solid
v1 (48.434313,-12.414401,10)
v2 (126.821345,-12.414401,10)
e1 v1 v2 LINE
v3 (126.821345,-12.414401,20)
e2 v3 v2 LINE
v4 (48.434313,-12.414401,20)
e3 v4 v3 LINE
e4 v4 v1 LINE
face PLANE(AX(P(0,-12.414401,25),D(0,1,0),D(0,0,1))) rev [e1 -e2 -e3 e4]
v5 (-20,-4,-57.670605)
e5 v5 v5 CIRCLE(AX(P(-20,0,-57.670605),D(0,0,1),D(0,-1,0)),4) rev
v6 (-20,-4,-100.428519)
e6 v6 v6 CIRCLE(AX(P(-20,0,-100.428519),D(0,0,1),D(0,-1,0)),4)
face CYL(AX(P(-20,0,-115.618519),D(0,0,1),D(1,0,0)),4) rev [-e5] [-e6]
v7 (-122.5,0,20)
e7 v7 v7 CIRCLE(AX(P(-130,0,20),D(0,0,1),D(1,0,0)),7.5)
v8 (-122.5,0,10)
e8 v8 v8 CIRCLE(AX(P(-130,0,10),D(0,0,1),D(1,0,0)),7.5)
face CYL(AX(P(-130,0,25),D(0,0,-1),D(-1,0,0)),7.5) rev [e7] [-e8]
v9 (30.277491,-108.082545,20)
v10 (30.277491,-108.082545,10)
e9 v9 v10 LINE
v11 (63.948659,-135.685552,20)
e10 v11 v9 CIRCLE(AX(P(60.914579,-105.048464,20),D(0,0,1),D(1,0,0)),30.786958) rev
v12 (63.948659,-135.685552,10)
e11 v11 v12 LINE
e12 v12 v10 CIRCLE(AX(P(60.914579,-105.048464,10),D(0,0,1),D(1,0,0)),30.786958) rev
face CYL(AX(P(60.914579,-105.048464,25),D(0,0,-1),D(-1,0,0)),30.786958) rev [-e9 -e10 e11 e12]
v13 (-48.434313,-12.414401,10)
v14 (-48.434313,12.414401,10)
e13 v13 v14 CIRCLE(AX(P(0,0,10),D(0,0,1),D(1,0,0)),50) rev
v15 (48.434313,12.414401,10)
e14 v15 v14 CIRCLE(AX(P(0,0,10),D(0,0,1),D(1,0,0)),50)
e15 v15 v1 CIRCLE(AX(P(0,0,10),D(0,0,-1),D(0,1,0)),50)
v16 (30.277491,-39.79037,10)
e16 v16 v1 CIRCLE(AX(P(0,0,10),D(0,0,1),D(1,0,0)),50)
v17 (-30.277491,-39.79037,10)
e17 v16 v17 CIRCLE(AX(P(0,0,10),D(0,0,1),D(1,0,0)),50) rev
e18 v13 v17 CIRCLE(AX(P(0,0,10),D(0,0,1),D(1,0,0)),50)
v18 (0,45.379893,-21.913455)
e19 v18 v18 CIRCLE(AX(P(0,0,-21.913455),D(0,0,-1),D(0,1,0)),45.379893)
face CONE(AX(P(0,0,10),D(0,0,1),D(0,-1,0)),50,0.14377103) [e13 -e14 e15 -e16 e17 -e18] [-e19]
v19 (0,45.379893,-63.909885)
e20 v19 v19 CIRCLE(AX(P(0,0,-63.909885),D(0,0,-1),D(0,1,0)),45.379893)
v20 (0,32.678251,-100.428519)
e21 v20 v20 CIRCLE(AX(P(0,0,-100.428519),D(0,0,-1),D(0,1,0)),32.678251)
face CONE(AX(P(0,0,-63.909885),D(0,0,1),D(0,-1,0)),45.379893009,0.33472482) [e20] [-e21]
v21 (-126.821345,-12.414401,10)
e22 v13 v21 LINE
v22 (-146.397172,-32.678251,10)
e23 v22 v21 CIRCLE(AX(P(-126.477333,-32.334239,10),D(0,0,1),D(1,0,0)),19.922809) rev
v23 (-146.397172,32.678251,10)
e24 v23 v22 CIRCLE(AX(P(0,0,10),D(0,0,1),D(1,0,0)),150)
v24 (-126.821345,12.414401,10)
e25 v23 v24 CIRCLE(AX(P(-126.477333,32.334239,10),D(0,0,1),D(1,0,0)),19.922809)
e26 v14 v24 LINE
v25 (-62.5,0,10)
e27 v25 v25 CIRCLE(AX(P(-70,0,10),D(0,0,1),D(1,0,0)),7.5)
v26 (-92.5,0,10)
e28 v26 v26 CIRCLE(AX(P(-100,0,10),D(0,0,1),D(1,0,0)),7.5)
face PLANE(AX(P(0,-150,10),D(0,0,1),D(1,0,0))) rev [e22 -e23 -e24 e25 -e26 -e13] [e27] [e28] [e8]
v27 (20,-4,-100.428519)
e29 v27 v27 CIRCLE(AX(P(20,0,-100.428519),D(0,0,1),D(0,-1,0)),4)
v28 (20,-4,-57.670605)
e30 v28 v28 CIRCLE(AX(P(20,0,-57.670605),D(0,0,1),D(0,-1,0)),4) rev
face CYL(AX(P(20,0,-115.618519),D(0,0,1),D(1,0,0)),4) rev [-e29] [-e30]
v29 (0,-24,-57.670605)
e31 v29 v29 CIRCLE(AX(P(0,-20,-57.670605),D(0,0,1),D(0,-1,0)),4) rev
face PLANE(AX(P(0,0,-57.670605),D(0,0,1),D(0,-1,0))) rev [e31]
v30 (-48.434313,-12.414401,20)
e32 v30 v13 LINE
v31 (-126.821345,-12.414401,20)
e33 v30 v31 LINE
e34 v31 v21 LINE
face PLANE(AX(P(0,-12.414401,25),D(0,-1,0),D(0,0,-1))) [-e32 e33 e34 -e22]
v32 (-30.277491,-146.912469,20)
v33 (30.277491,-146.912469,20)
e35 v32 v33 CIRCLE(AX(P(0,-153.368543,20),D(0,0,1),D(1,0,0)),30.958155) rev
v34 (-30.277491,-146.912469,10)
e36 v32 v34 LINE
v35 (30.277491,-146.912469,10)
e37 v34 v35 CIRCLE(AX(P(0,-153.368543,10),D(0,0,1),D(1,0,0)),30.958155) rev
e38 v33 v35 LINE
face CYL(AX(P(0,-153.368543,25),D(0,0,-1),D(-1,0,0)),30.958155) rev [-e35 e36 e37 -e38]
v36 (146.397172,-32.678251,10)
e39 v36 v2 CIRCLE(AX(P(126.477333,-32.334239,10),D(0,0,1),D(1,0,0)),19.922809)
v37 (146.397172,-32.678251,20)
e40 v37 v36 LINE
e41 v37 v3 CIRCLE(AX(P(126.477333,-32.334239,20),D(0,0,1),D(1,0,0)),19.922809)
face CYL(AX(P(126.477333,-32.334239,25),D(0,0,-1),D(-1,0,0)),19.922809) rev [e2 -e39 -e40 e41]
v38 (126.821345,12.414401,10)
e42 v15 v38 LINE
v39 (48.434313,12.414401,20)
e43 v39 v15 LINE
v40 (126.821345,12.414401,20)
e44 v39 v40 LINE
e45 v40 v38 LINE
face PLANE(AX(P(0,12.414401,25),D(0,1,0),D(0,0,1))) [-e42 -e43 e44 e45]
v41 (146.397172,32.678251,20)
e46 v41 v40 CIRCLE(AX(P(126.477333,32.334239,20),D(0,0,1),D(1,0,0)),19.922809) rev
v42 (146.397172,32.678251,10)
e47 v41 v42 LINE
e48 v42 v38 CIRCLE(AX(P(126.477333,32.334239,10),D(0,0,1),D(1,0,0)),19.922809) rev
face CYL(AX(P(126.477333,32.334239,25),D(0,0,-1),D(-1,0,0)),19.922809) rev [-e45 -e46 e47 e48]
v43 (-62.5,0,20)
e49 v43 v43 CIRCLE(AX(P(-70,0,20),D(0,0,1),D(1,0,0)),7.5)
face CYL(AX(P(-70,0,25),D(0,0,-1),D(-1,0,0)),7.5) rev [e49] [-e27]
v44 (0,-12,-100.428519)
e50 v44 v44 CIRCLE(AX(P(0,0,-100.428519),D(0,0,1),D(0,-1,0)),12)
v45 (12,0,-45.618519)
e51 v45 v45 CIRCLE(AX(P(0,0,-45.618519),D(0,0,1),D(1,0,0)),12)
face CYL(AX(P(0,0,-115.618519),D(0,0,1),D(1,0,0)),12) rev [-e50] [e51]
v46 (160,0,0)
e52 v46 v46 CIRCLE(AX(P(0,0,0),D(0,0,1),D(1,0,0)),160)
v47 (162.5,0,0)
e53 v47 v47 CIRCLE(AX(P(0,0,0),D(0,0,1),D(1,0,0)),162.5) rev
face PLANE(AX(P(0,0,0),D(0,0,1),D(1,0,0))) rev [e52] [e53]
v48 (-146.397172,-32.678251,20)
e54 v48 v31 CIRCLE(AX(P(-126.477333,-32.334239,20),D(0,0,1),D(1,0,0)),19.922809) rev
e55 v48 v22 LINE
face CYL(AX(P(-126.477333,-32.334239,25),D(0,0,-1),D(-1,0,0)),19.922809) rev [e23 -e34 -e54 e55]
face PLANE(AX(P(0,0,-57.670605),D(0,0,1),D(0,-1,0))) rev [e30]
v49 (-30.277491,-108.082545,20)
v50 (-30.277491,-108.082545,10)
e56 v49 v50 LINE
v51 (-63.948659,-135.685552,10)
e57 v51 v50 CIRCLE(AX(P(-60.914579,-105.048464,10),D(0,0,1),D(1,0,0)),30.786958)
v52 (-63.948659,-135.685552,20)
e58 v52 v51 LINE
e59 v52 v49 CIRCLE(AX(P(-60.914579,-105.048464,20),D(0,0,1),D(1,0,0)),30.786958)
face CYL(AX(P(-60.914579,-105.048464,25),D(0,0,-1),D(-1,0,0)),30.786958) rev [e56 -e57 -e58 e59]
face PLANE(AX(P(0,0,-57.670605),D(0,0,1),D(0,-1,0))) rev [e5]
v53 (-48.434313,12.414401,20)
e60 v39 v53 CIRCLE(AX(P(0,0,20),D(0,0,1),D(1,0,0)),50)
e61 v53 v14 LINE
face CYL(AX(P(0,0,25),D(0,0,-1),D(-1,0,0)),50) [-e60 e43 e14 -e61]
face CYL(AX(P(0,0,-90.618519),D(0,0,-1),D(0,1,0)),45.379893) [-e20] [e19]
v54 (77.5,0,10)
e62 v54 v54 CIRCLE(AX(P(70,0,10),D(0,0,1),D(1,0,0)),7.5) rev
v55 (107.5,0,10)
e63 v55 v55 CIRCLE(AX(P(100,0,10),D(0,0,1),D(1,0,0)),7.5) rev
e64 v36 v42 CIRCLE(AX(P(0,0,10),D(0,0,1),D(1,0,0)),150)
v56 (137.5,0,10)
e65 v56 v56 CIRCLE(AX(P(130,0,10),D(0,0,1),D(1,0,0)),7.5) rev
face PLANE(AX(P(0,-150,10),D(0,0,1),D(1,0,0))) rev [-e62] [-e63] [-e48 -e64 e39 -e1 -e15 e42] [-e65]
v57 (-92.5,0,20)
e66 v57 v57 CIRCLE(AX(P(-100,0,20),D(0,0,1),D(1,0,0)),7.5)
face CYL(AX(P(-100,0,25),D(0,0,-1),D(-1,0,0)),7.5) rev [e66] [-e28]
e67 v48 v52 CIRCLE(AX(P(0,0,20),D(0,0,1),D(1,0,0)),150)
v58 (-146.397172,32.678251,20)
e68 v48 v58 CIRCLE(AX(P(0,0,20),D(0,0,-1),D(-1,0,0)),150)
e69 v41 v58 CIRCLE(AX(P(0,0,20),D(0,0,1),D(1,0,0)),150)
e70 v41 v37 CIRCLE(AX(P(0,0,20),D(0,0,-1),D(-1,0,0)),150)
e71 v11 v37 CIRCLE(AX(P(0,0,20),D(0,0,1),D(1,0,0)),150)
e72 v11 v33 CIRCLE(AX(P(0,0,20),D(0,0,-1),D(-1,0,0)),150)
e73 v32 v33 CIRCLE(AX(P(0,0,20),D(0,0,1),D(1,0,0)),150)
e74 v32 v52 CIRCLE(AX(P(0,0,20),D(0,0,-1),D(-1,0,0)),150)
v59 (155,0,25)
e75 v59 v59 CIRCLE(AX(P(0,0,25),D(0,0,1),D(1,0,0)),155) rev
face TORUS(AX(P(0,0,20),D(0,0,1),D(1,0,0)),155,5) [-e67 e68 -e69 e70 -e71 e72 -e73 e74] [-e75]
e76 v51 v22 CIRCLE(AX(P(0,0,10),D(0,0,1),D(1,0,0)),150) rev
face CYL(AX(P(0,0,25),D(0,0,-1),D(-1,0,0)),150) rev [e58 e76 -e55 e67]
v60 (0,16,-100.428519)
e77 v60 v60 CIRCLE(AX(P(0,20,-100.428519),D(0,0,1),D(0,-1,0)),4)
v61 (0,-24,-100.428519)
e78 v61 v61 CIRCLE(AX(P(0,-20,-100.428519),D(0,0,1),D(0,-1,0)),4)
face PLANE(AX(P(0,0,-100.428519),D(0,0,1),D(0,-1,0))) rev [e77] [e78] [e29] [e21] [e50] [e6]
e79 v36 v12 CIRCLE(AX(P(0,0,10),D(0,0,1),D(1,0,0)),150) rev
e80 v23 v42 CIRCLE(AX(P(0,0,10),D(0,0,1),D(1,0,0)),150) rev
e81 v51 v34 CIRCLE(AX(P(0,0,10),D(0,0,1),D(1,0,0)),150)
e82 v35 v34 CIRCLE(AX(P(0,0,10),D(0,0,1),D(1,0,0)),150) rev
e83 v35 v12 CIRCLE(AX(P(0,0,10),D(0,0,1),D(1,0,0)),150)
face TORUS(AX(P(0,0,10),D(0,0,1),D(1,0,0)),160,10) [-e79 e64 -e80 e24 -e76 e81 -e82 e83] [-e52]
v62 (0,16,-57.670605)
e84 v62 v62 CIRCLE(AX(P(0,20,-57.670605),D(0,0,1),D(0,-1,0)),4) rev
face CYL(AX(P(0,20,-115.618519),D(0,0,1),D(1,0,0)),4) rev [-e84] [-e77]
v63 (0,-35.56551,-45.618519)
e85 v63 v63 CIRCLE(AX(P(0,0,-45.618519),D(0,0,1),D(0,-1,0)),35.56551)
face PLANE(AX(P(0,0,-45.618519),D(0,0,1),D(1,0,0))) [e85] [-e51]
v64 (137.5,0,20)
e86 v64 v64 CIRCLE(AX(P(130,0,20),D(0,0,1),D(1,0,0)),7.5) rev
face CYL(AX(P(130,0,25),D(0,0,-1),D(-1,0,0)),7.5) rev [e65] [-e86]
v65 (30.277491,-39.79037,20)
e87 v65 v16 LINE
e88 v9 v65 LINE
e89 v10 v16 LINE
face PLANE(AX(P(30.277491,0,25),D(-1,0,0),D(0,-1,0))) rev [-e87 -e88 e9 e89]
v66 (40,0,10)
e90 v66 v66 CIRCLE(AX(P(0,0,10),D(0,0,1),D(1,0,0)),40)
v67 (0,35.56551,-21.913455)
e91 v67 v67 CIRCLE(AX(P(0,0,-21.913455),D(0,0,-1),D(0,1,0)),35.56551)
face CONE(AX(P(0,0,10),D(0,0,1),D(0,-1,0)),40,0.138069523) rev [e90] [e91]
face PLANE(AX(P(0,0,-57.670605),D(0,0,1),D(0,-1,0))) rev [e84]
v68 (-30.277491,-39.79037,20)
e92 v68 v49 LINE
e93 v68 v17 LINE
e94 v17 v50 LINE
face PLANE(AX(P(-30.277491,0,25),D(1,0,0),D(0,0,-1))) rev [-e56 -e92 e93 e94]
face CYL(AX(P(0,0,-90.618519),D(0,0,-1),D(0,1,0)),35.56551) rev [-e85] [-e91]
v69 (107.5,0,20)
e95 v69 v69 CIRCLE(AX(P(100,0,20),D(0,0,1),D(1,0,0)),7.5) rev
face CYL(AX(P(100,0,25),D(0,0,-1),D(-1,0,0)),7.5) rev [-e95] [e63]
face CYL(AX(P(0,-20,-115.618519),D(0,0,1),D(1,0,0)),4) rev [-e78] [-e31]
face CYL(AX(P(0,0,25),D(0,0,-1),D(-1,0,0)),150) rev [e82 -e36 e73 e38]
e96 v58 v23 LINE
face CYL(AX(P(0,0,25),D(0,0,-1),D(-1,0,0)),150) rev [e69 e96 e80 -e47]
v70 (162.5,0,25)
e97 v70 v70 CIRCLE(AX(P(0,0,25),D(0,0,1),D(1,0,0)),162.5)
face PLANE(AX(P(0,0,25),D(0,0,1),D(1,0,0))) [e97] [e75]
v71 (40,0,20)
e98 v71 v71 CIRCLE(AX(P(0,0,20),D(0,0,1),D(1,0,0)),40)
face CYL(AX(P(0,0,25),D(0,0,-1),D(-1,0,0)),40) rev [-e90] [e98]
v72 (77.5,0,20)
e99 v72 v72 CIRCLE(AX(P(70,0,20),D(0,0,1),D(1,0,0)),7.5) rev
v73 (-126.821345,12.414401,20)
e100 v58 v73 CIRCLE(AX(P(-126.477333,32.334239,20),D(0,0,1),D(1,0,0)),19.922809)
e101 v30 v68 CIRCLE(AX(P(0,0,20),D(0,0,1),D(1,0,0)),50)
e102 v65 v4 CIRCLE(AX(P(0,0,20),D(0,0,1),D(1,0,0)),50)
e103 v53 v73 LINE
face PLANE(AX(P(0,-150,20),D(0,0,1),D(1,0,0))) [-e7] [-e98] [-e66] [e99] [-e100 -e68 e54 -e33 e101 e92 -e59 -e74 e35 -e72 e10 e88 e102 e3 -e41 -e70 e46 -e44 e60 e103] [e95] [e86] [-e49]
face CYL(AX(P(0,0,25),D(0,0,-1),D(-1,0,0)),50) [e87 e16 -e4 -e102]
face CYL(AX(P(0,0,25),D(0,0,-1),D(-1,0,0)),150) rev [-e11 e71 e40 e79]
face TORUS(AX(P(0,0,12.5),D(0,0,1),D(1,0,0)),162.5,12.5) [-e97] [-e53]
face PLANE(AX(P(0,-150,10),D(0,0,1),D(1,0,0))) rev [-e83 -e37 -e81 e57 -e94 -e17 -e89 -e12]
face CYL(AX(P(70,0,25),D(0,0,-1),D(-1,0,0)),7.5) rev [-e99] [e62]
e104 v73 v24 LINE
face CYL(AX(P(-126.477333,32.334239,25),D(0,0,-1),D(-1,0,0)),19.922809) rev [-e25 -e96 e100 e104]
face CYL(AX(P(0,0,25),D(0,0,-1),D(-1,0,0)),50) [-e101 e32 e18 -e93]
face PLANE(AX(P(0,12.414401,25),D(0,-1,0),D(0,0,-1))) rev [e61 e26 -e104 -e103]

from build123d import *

# Parameters (mm, degrees)
SZKIC1_R                    = 175
SZKIC1_R_2                  = 40
SZKIC1_R_3                  = 7.5
DODANIE_WYCI_GNI_CIE1_DEPTH = 25
ZAOKR_GLENIE1_R             = 12.5
SZKIC2_W                    = 10
SZKIC2_H                    = 150
SZKIC3_W                    = 5
SZKIC3_H                    = 150
ZAOKR_GLENIE4_R             = 10
ZAOKR_GLENIE5_R             = 5
SZKIC5_R                    = 12
SZKIC5_R_2                  = 4
WYTNIJ_WYCI_GNI_CIE1_DEPTH  = 25
DODANIE_WYCI_GNI_CIE4_START = 45
SZKIC9_R                    = 27.052132897
SZKIC9_R_2                  = 12
SZKIC9_R_3                  = 4
DODANIE_WYCI_GNI_CIE4_DEPTH = 45


with BuildPart() as part:
    # Szkic1 → Dodanie-wyciągnięcie1 (new body)
    with BuildSketch(Plane.XY):
        Circle(SZKIC1_R)
        Circle(SZKIC1_R_2, mode=Mode.SUBTRACT)
        with BuildLine():
            ThreePointArc((63.948658552, -135.685552176), (41.3963046, -128.857575517), (30.277490786, -108.082544509))
            Line((30.277490786, -108.082544509), (30.277490786, -39.790370088))
            ThreePointArc((30.277490786, -39.790370088), (41.668308443, -27.636064689), (48.434312767, -12.414400782))
            Line((48.434312767, -12.414400782), (126.821344913, -12.414400782))
            ThreePointArc((126.821344913, -12.414400782), (140.806039181, -18.492039568), (146.397171731, -32.678251316))
            ThreePointArc((146.397171731, -32.678251316), (117.106652616, -93.733835476), (63.948658552, -135.685552176))
        make_face(mode=Mode.SUBTRACT)
        with BuildLine():
            ThreePointArc((146.397171731, 32.678251316), (140.806039181, 18.492039568), (126.821344913, 12.414400782))
            Line((126.821344913, 12.414400782), (48.434312767, 12.414400782))
            ThreePointArc((48.434312767, 12.414400782), (0, 50), (-48.434312767, 12.414400782))
            Line((-48.434312767, 12.414400782), (-126.821344913, 12.414400782))
            ThreePointArc((-126.821344913, 12.414400782), (-140.806039181, 18.492039568), (-146.397171731, 32.678251316))
            ThreePointArc((-146.397171731, 32.678251316), (0, 150), (146.397171731, 32.678251316))
        make_face(mode=Mode.SUBTRACT)
        with BuildLine():
            ThreePointArc((-146.397171731, -32.678251316), (-140.806039181, -18.492039568), (-126.821344913, -12.414400782))
            Line((-126.821344913, -12.414400782), (-48.434312767, -12.414400782))
            ThreePointArc((-48.434312767, -12.414400782), (-41.668308443, -27.636064689), (-30.277490786, -39.790370088))
            Line((-30.277490786, -39.790370088), (-30.277490786, -108.082544509))
            ThreePointArc((-30.277490786, -108.082544509), (-41.3963046, -128.857575517), (-63.948658552, -135.685552176))
            ThreePointArc((-63.948658552, -135.685552176), (-117.106652616, -93.733835476), (-146.397171731, -32.678251316))
        make_face(mode=Mode.SUBTRACT)
        with BuildLine():
            ThreePointArc((-30.277490786, -146.912469014), (0, -122.410388377), (30.277490786, -146.912469014))
            ThreePointArc((30.277490786, -146.912469014), (0, -150), (-30.277490786, -146.912469014))
        make_face(mode=Mode.SUBTRACT)
        with Locations((-70, 0)):
            Circle(SZKIC1_R_3, mode=Mode.SUBTRACT)
        with Locations((-100, 0)):
            Circle(SZKIC1_R_3, mode=Mode.SUBTRACT)
        with Locations((-130, 0)):
            Circle(SZKIC1_R_3, mode=Mode.SUBTRACT)
        with Locations((100, 0)):
            Circle(SZKIC1_R_3, mode=Mode.SUBTRACT)
        with Locations((70, 0)):
            Circle(SZKIC1_R_3, mode=Mode.SUBTRACT)
        with Locations((130, 0)):
            Circle(SZKIC1_R_3, mode=Mode.SUBTRACT)
    extrude(amount=DODANIE_WYCI_GNI_CIE1_DEPTH)

    # Zaokrąglenie1
    zaokr_glenie1_edges = [part.edges().sort_by_distance(p)[0] for p in [
        (-175, 0, 25),
        (-175, 0, 0),
    ]]
    fillet(zaokr_glenie1_edges, radius=ZAOKR_GLENIE1_R - 0.0001)  # a hair under: the kernel refuses the full size

    # Szkic2 → Wycięcie-obrót1 (revolve, cut)
    with BuildSketch(Plane(origin=(0, 0, 0), x_dir=(0, 0, -1), z_dir=(1, 0, 0)), mode=Mode.PRIVATE) as wyci_cie_obr_t1_sk:
        with Locations((-5, -75)):
            Rectangle(SZKIC2_W, SZKIC2_H)
    revolve(wyci_cie_obr_t1_sk.sketch.rotate(Axis((0, 0, 10), (0, 0, -1)), 77.416921492), axis=Axis((0, 0, 10), (0, 0, -1)), mode=Mode.SUBTRACT)

    # Szkic3 → Wycięcie-obrót2 (revolve, cut)
    with BuildSketch(Plane(origin=(0, 0, 0), x_dir=(0, 0, -1), z_dir=(1, 0, 0)), mode=Mode.PRIVATE) as wyci_cie_obr_t2_sk:
        with Locations((-22.5, -75)):
            Rectangle(SZKIC3_W, SZKIC3_H)
    revolve(wyci_cie_obr_t2_sk.sketch.rotate(Axis((0, 0, 20), (0, 0, 1)), 90), axis=Axis((0, 0, 20), (0, 0, 1)), mode=Mode.SUBTRACT)

    # Zaokrąglenie4
    zaokr_glenie4_edges = [part.edges().sort_by_distance(p)[0] for p in [
        (150, 0, 0),
    ]]
    fillet(zaokr_glenie4_edges, radius=ZAOKR_GLENIE4_R - 0.0001)  # a hair under: the kernel refuses the full size

    # Zaokrąglenie5
    zaokr_glenie5_edges = [part.edges().sort_by_distance(p)[0] for p in [
        (149.096572328, -16.438130069, 25),
    ]]
    fillet(zaokr_glenie5_edges, radius=ZAOKR_GLENIE5_R - 0.0001)  # a hair under: the kernel refuses the full size

    # Szkic4 → Obrót3 (revolve)
    with BuildSketch(Plane(origin=(0, 0, 0), x_dir=(0, 0, -1), z_dir=(1, 0, 0))):
        Polygon((-10, 50), (21.913455258, 45.379893009), (63.909884625, 45.379893009), (100.428518858, 32.678251316), (100.428518858, 0), (90.618518858, 0), (90.618518858, 27.052132897), (63.909884625, 35.565510059), (21.913455258, 35.565510059), (-10, 40), align=None)
    revolve(axis=Axis((0, 0, -90.618518858), (0, 0, 1)))

    # Szkic5 → Wytnij-wyciągnięcie1 (cut)
    with BuildSketch(Plane.XY.offset(-90.618518858)):
        Circle(SZKIC5_R)
        with Locations((0, 20)):
            Circle(SZKIC5_R_2)
        with Locations((20, 0)):
            Circle(SZKIC5_R_2)
        with Locations((0, -20)):
            Circle(SZKIC5_R_2)
        with Locations((-20, 0)):
            Circle(SZKIC5_R_2)
    extrude(amount=-WYTNIJ_WYCI_GNI_CIE1_DEPTH, mode=Mode.SUBTRACT)

    # Szkic9 → Dodanie-wyciągnięcie4 (add)
    with BuildSketch(Plane.XY.offset(-90.618518858).offset(DODANIE_WYCI_GNI_CIE4_START)):
        with Locations(Location((0, 0, 0), (0, 0, 180))):
            Circle(SZKIC9_R)
        Circle(SZKIC9_R_2, mode=Mode.SUBTRACT)
        with Locations((0, 20)):
            Circle(SZKIC9_R_3, mode=Mode.SUBTRACT)
        with Locations((20, 0)):
            Circle(SZKIC9_R_3, mode=Mode.SUBTRACT)
        with Locations((0, -20)):
            Circle(SZKIC9_R_3, mode=Mode.SUBTRACT)
        with Locations((-20, 0)):
            Circle(SZKIC9_R_3, mode=Mode.SUBTRACT)
    extrude(amount=-DODANIE_WYCI_GNI_CIE4_DEPTH)

    # Szkic10 → Obrót4 (revolve)
    with BuildSketch(Plane(origin=(0, 0, 0), x_dir=(0, 0, -1), z_dir=(1, 0, 0)), mode=Mode.PRIVATE) as obr_t4_sk:
        Polygon((63.909884625, 35.565510059), (45.618518858, 35.565510059), (45.618518858, 12), (57.670604535, 12), (57.670604535, 27.052132897), (90.618518858, 27.052132897), align=None)
    revolve(obr_t4_sk.sketch.rotate(Axis((0, 0, 0), (0, 0, -1)), 90), axis=Axis((0, 0, 0), (0, 0, -1)))


solid = part.part
